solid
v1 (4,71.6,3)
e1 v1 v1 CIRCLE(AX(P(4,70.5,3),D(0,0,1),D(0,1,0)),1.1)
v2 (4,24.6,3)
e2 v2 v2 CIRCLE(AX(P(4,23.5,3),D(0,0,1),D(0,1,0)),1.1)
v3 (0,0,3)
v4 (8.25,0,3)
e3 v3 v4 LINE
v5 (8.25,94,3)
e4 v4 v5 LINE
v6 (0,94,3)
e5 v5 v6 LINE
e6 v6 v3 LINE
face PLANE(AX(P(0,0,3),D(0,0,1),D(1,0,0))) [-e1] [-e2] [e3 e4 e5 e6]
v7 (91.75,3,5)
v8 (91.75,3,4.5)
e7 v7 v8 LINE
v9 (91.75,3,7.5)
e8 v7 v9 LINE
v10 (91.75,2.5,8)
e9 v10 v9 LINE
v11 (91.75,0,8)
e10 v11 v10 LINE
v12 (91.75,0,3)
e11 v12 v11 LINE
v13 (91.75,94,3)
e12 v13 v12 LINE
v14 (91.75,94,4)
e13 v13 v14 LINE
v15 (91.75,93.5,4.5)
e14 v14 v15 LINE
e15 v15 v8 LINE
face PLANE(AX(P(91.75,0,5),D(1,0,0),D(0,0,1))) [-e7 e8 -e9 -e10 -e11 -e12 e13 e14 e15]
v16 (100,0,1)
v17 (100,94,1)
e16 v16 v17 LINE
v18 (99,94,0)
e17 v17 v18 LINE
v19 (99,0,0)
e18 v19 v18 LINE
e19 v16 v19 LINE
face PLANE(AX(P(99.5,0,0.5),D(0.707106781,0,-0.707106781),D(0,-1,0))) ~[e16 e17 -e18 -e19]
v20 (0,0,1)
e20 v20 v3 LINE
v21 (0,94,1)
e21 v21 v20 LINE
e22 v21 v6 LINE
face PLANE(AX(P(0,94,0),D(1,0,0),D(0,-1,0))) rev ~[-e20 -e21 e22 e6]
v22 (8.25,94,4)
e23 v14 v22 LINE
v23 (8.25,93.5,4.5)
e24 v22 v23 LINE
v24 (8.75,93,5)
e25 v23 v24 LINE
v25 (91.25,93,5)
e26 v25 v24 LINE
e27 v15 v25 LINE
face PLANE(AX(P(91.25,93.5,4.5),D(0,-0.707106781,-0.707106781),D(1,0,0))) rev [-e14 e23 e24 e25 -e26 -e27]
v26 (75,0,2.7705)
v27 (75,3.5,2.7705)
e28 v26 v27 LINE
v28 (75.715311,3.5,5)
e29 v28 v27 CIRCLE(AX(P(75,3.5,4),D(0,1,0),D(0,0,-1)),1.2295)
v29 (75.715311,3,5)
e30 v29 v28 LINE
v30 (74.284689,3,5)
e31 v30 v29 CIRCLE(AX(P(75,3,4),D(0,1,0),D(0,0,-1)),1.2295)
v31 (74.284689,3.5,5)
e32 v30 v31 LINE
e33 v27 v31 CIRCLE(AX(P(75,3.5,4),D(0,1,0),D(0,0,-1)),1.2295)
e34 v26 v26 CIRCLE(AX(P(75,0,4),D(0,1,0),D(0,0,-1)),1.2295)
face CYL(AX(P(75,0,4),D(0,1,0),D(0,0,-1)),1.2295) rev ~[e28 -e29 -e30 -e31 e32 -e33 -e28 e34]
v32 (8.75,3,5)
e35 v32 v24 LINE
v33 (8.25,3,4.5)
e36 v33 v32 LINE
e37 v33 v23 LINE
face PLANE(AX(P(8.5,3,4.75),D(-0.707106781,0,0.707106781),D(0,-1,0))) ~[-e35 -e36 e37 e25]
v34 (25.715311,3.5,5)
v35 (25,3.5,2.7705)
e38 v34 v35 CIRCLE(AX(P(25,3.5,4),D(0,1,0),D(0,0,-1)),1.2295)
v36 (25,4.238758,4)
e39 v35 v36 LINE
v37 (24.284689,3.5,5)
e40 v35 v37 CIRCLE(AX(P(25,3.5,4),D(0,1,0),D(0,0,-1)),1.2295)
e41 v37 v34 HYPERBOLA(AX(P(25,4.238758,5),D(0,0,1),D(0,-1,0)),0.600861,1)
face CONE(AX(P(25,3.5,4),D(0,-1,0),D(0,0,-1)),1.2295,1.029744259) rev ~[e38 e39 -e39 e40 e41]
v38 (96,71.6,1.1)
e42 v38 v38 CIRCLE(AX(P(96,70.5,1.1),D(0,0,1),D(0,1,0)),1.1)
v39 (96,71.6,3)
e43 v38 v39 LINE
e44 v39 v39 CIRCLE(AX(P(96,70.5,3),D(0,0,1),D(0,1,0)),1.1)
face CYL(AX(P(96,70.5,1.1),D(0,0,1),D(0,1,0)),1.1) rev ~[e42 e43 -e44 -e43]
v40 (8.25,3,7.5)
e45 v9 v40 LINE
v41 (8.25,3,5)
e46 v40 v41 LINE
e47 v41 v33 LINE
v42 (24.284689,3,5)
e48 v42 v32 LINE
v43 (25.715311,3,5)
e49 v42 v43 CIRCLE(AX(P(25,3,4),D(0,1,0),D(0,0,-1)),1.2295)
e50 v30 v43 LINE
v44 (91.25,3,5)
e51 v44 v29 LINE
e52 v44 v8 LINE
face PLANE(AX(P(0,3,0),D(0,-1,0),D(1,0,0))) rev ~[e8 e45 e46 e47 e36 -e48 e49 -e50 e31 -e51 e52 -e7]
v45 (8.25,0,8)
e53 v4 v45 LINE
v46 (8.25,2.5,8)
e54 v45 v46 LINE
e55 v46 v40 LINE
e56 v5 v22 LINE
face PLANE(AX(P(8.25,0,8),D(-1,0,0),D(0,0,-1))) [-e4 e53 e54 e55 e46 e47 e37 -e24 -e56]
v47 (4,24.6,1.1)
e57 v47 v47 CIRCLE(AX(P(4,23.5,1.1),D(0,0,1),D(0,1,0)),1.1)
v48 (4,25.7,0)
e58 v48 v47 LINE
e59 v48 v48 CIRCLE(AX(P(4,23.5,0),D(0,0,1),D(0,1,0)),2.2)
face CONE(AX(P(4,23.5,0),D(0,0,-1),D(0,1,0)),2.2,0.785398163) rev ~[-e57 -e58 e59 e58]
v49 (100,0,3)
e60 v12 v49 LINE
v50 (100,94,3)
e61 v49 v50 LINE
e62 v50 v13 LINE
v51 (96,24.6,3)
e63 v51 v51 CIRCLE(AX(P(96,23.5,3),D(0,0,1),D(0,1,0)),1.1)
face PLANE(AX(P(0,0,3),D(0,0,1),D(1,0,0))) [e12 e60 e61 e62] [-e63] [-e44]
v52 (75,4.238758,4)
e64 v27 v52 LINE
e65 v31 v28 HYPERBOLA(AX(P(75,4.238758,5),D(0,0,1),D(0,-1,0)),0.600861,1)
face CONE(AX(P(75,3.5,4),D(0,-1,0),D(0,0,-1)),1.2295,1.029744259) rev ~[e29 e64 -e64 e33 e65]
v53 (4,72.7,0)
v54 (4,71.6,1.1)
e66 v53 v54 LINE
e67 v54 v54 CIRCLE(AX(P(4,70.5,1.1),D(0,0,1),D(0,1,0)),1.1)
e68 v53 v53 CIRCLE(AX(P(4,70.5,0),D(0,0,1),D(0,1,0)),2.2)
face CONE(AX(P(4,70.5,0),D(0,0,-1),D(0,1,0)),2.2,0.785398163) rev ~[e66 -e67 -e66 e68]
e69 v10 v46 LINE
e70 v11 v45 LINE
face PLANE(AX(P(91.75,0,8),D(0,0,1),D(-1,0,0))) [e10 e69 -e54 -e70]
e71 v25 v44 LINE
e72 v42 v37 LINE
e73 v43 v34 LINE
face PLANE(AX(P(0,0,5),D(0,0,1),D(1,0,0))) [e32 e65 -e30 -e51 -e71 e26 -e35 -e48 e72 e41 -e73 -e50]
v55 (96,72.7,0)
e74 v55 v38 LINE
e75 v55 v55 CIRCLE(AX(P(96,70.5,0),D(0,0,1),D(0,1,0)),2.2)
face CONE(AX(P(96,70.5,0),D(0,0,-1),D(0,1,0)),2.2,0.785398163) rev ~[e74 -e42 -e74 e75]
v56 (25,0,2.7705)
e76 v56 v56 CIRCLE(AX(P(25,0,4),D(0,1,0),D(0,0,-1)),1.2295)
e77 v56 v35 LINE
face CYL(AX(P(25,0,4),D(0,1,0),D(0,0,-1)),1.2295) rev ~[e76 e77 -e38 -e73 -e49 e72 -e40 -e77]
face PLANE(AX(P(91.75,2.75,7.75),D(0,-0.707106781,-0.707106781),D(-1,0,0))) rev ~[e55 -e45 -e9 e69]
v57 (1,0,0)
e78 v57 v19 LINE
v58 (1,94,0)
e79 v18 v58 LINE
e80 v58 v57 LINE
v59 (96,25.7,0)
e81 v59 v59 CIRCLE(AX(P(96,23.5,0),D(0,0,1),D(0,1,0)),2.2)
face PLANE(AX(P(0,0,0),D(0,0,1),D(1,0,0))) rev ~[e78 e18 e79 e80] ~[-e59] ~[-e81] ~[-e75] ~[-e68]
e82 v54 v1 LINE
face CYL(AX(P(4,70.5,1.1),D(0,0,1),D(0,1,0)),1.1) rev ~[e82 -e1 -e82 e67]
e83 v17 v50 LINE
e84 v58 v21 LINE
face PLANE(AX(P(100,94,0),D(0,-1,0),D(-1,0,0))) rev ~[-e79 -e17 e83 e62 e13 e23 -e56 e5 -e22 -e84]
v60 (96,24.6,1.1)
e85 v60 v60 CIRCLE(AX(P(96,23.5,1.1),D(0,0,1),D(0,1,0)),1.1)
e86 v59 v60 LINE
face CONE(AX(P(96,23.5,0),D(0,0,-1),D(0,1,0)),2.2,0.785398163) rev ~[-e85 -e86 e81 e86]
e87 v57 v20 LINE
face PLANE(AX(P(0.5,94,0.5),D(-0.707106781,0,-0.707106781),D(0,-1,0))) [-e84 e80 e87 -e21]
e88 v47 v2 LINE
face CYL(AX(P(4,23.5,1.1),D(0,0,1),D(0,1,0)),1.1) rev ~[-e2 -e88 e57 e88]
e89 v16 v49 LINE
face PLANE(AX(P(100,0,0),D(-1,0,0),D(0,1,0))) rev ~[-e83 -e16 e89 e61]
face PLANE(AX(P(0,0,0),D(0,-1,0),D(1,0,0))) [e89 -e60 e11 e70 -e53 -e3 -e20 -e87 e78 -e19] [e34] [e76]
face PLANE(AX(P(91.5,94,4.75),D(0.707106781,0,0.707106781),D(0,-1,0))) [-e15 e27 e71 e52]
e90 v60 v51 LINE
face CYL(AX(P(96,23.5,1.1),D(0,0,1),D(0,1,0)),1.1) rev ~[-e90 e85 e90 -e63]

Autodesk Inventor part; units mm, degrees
ref_plane "YZ Plane" through (0, 0, 0) normal (1, 0, 0) x (0, 1, 0)
ref_plane "XZ Plane" through (0, 0, 0) normal (0, 1, 0) x (-1, 0, 0)
ref_plane "XY Plane" through (0, 0, 0) normal (0, 0, 1) x (1, 0, 0)
sketch "Sketch1" plane through (0, 0, 0) normal (0, 0, 1) x (1, 0, 0)
  line L0 (0, 0) -> (100, 0)
  line L1 (100, 0) -> (100, 94)
  line L2 (100, 94) -> (0, 94)
  line L3 (0, 94) -> (0, 0)
  dimension "d0" = 100
  dimension "d1" = 94
extrude "Extrusion1" add sketch "Sketch1" along normal blind 3
sketch "Sketch2" plane through (0, 0, 3) normal (0, 0, 1) x (1, 0, 0)
  line L0 (100, 94) -> (0, 94) projected
  line L1 (8.25, 94) -> (91.75, 94)
  line L2 (91.75, 94) -> (91.75, 0)
  line L3 (91.75, 0) -> (8.25, 0)
  line L4 (8.25, 0) -> (8.25, 94)
  line L5 (100, 0) -> (100, 94) construction
  line L6 (100, 94) -> (92, 94) construction
  line L7 (92, 94) -> (92, 0) construction
  line L8 (92, 0) -> (100, 0) construction
  line L9 (100, 0) -> (100, 94) construction
  line L10 (0, 94) -> (8, 94) construction
  line L11 (8, 94) -> (8, 0) construction
  line L12 (8, 0) -> (0, 0) construction
  line L13 (0, 0) -> (0, 94) construction
  line L14 (0, 0) -> (100, 0) construction
  dimension "d4" = 8
  dimension "d5" = 0.25
  dimension "d6" = 0.25
extrude "Extrusion2" add sketch "Sketch2" along normal blind 2
sketch "Sketch4" plane through (0, 0, 0) normal (0, -1, 0) x (1, 0, 0)
  line L0 (91.75, 5) -> (8.25, 5) projected
  line L1 (8.25, 5) -> (91.75, 5)
  line L2 (91.75, 5) -> (91.75, 8)
  line L3 (91.75, 8) -> (8.25, 8)
  line L4 (8.25, 8) -> (8.25, 5)
  line L5 (91.75, 3) -> (91.75, 5) projected
  line L6 (0, 0) -> (100, 0) projected
  dimension "d10" = 8
extrude "Extrusion3" add sketch "Sketch4" against normal blind 3
sketch "Sketch6" plane through (0, 0, 0) normal (0, -1, 0) x (1, 0, 0)
  line L0 (0, 0) -> (100, 0) projected
  line L1 (91.75, 8) -> (8.25, 8) projected
  line L2 (100, 0) -> (100, 3) projected
  point P0 (25, 4)
  point P1 (75, 4)
  dimension "d20" = 8
  dimension "d21" = 4
  dimension "d22" = 100
  dimension "d23" = 25
  dimension "d24" = 50
hole "Hole1" at (25, 0, 4) at (75, 0, 4) direction (0, 1, 0) diameter 2.459 depth 3.5 tip angle 118 thread size "M3x0.5" class "6H" standard "ANSI Metric M Profile"
sketch "Sketch7" plane through (0, 0, 0) normal (0, 0, -1) x (-1, 0, 0)
  line L0 (-91.75, 94) -> (-91.75, 0) projected
  line L1 (-8.25, 0) -> (-8.25, 94) projected
  line L2 (-100, 0) -> (-100, 94) projected
  line L3 (0, 94) -> (0, 0) projected
  line L4 (-100, 94) -> (0, 94) projected
  point P0 (-96, 70.5)
  point P1 (-4, 70.5)
  point P2 (-96, 23.5)
  point P3 (-4, 23.5)
  dimension "d32" = 8.25
  dimension "d33" = 4
  dimension "d34" = 4
  dimension "d35" = 94
  dimension "d36" = 23.5
  dimension "d39" = 47
hole "Hole2" at (96, 70.5, 0) at (4, 70.5, 0) at (96, 23.5, 0) at (4, 23.5, 0) direction (0, 0, 1) diameter 2.2 depth 3.5 tip angle 118 countersink diameter 4.4 countersink angle 90 clearance for "Flat Head Machine Screw" size "M2" standard "Ansi Metric M Profile"
chamfer "Chamfer2" distance 0.5 angle 45 3 edges at (8.25, 48.5, 5) (91.75, 48.5, 5) (50, 3, 8)
chamfer "Chamfer3" distance 1 angle 45 1 edges at (50, 94, 5)
chamfer "Chamfer4" distance 1 angle 45 2 edges at (0, 47, 0) (100, 47, 0)
equation "\"d6\" = d5"
equation "\"d21\" = 0.5 * d20"
equation "\"d23\" = 0.25 * d22"
equation "\"d24\" = 2 * d23"
equation "\"d34\" = d33"
equation "\"d36\" = 0.25 * d35"
equation "\"d39\" = 2 * d36"
properties part number "FrontPanel" material "Aluminum 6061"
